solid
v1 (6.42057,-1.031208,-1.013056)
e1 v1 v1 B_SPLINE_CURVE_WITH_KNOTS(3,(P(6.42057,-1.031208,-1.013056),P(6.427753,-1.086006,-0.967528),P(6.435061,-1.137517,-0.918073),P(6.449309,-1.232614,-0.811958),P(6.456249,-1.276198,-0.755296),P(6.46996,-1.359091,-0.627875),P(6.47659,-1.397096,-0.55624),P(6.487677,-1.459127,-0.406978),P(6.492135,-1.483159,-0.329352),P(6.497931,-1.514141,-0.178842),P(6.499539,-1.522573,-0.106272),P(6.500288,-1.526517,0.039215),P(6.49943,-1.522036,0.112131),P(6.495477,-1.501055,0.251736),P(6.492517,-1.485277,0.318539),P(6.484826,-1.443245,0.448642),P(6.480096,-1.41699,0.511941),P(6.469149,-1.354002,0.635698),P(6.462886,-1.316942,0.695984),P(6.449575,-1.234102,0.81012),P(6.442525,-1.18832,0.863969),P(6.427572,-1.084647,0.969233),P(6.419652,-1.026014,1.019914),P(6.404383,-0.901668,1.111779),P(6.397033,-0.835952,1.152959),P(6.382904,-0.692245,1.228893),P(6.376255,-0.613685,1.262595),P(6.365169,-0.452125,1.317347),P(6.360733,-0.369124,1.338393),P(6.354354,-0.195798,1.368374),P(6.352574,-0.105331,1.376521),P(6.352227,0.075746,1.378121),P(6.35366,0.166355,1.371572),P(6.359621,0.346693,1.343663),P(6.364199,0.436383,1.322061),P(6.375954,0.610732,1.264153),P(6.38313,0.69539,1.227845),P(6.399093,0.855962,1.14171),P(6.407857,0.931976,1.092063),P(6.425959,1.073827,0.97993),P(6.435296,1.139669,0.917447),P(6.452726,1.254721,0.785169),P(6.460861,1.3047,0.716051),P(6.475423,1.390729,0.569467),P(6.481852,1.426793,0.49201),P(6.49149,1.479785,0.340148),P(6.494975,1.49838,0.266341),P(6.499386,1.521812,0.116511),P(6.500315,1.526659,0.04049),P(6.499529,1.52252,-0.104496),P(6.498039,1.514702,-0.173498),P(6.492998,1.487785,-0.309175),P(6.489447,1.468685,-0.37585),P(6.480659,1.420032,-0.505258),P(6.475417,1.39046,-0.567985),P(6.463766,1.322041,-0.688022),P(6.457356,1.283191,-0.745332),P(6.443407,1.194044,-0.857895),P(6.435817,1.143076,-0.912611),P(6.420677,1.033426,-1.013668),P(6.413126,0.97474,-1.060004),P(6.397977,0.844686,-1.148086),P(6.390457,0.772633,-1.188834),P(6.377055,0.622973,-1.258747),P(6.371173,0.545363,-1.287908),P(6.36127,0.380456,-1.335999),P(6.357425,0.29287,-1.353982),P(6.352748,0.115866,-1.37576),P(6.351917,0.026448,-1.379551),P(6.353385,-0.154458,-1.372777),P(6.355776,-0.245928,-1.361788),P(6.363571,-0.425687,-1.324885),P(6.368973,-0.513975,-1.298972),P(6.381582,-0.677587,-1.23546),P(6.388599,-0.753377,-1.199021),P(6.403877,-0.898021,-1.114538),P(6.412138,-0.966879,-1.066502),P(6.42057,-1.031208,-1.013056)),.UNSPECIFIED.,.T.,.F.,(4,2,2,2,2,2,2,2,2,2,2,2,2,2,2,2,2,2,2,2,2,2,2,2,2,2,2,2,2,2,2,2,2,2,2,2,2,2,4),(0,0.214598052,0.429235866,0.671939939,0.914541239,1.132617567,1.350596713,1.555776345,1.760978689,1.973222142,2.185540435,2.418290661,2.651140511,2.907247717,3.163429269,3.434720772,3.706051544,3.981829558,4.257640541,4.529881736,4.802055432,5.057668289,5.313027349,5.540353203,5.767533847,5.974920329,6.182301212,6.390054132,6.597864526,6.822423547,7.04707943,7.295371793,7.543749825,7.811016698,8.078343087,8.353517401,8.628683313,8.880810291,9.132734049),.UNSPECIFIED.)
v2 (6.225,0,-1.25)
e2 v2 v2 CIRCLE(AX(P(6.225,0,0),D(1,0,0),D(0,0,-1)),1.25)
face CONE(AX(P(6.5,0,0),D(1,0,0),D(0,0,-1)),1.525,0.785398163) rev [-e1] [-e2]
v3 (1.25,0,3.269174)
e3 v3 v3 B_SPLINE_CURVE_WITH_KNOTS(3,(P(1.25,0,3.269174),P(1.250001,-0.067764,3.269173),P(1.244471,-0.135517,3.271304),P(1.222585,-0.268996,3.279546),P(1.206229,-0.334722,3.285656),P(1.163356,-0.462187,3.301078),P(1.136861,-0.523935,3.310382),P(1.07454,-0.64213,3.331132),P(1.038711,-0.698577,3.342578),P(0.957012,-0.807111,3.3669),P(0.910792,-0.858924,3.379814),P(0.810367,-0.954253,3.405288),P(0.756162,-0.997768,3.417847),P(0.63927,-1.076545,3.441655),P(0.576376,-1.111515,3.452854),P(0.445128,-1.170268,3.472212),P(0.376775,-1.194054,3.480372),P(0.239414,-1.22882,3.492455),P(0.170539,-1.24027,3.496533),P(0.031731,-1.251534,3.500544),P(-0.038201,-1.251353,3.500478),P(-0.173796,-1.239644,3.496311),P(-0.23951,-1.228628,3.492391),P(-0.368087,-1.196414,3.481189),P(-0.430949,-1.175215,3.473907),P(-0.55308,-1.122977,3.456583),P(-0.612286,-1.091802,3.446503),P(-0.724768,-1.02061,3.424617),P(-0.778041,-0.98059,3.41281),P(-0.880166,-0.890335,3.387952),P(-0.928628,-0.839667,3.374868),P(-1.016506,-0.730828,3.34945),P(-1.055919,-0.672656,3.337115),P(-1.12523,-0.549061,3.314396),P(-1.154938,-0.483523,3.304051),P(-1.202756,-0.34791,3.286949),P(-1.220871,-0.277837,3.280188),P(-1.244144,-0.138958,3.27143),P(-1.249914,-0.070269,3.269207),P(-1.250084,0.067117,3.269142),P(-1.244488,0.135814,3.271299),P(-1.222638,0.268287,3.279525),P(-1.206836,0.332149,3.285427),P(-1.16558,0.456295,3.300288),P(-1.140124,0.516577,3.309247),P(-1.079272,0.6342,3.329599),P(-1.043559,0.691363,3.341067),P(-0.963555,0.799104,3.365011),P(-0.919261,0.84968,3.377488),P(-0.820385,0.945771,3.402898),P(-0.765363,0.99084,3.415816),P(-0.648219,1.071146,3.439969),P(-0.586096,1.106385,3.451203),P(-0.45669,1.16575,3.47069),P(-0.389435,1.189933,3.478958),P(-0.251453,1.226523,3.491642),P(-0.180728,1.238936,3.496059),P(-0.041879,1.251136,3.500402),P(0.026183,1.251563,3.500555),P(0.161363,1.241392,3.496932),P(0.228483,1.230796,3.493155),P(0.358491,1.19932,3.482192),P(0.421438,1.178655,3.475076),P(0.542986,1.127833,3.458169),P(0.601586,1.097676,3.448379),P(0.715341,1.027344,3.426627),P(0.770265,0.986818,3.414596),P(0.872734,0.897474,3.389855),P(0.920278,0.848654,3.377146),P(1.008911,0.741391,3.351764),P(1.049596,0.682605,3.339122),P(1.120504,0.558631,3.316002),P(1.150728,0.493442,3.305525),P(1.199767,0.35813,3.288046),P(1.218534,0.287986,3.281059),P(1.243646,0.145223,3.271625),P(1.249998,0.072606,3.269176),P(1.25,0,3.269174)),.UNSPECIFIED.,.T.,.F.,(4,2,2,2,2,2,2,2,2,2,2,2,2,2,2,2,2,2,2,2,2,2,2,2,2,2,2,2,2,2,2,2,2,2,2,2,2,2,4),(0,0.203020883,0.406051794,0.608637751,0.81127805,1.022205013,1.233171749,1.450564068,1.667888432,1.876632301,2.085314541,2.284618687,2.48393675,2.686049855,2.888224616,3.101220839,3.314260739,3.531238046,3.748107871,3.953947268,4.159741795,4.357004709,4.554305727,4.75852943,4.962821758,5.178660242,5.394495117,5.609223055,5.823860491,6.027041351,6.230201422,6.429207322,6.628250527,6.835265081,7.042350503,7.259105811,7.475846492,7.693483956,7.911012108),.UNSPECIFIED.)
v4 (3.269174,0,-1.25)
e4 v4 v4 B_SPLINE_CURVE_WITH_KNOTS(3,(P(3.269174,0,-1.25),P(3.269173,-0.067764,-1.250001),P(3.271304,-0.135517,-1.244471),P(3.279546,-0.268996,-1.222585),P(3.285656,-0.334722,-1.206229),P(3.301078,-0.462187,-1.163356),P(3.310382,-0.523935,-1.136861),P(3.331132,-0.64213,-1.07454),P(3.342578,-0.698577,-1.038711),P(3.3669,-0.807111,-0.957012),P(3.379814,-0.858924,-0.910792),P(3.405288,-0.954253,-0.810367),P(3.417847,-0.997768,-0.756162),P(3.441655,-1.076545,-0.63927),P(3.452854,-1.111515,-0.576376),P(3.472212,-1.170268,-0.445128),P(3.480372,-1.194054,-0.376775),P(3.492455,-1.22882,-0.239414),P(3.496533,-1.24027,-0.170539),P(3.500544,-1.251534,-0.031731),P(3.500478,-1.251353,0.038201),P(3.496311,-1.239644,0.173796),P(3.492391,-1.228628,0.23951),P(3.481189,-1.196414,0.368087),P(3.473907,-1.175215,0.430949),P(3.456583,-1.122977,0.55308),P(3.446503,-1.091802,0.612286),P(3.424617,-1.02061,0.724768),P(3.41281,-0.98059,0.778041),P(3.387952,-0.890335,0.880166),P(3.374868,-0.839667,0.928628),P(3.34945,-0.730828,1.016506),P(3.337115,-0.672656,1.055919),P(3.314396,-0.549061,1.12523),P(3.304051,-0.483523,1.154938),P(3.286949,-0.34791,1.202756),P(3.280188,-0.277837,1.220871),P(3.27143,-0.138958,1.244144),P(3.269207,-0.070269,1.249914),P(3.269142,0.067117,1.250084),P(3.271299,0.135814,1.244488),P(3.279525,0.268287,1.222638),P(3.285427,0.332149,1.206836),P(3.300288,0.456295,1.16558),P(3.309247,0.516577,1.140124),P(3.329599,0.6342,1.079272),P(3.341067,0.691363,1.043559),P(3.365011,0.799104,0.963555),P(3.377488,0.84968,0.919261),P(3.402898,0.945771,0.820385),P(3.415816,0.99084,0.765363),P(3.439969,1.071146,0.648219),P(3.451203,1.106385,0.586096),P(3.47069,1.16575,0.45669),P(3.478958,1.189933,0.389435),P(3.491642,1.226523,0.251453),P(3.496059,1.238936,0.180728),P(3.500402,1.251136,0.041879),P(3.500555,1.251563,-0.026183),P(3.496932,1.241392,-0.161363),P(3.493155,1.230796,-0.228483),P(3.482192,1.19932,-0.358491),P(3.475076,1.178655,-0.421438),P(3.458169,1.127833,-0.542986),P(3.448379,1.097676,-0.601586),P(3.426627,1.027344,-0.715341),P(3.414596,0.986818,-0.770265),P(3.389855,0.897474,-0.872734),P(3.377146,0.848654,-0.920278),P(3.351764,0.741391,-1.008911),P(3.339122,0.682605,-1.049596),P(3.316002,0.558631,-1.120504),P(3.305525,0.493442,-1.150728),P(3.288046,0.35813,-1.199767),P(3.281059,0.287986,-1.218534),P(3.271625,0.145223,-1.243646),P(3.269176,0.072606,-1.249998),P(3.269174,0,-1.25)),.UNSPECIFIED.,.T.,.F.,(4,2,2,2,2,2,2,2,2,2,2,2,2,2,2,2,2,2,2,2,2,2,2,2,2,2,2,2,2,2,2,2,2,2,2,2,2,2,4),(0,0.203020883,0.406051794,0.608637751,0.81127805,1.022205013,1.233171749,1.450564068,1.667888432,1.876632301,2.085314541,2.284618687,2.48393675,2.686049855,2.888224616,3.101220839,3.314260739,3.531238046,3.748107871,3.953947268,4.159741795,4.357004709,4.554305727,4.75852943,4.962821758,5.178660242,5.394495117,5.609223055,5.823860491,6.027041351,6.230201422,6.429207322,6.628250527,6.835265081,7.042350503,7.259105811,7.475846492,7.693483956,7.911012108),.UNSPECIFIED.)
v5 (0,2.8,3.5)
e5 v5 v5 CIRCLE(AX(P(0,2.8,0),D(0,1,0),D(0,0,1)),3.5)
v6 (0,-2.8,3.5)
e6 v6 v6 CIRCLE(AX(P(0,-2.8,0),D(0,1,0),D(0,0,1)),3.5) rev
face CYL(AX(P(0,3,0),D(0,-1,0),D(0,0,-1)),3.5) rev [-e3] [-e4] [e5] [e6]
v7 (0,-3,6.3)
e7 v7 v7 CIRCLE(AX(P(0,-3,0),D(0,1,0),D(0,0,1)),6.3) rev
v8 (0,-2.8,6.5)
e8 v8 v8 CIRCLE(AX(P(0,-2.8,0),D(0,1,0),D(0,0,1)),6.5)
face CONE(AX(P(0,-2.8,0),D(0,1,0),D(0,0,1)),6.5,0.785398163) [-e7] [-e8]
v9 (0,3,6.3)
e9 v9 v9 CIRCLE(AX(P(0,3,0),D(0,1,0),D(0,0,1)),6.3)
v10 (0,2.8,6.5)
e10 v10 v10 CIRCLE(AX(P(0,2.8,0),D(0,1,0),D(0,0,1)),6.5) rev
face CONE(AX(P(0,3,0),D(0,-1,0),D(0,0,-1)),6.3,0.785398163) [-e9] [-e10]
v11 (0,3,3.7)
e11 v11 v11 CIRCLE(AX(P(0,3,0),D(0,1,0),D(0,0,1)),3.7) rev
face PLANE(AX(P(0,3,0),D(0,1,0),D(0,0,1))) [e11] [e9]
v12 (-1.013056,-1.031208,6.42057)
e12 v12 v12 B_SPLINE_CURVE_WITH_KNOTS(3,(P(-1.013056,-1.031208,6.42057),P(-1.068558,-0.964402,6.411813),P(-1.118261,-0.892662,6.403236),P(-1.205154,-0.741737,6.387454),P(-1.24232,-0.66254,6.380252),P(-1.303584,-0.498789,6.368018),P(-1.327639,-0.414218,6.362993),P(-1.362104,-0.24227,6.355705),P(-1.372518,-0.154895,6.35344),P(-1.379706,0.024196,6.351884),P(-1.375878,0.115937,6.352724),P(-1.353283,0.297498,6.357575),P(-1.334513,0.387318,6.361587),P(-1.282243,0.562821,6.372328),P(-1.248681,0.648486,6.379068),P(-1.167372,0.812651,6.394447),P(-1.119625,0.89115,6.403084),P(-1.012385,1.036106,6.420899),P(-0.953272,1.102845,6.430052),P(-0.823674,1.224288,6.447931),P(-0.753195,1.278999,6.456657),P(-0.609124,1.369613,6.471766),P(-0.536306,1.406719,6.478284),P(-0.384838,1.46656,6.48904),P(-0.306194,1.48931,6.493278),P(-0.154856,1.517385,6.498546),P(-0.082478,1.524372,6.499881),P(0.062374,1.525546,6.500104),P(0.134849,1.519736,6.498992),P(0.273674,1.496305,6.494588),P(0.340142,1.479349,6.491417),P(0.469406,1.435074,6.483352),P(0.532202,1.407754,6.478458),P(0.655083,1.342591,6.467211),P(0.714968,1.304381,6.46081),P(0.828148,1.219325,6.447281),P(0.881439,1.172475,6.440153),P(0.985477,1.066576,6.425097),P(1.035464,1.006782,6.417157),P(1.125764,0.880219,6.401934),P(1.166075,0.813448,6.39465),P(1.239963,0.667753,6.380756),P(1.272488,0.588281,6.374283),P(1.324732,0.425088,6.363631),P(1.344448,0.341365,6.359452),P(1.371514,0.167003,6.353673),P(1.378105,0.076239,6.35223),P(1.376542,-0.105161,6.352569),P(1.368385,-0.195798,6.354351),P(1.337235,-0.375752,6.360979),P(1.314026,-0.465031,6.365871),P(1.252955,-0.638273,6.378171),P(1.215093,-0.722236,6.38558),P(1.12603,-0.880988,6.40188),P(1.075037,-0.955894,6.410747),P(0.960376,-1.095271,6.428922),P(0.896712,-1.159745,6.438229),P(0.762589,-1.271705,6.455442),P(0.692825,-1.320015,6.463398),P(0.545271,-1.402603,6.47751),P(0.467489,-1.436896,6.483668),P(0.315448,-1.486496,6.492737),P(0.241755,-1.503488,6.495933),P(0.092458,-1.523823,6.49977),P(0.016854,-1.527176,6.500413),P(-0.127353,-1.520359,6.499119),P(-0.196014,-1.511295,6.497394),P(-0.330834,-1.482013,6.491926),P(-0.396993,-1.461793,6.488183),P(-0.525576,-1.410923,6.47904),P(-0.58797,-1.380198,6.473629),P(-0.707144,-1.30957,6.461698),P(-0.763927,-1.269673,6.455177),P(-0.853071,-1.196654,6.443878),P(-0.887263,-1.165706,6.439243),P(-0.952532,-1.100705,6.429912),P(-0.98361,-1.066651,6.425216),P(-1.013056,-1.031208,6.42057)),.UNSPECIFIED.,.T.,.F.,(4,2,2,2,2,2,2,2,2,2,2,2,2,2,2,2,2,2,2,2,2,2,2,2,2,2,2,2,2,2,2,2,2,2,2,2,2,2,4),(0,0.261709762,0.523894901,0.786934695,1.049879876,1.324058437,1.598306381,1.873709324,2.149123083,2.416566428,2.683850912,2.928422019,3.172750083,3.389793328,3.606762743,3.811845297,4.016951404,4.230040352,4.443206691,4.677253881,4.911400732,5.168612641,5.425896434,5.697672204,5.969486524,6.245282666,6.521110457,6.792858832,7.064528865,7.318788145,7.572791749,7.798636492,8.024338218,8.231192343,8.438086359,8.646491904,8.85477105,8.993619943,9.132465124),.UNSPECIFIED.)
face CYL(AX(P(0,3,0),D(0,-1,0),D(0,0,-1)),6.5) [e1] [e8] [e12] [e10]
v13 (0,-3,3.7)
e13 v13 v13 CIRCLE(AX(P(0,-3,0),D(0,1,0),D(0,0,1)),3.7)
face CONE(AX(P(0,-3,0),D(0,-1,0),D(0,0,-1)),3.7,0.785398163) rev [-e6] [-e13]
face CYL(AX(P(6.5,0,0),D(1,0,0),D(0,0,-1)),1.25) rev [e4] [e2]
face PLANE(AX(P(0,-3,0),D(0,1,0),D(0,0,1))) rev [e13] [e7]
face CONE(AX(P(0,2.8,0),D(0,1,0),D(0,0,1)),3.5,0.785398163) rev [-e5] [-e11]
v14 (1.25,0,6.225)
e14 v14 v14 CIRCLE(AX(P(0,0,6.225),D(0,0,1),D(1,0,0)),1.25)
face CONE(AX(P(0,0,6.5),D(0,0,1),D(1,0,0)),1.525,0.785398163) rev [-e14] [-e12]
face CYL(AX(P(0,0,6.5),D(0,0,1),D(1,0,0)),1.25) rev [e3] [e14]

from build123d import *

# Parameters (mm, degrees)
PROFILES_R        = 6.5
PROFILES_R_2      = 3.5
PROFILE_DEPTH     = 3
CIRPATTERN1_COUNT = 2
CIRPATTERN1_ANGLE = 90
OUTERC_SIZE       = 0.2
INNERC_SIZE       = 0.2


# Read off the part's stored shape, not the designer's step:  Tapped Hole1
with BuildPart() as part:
    # ProfileS → Profile (new, symmetric)
    with BuildSketch(Plane(origin=(0, 0, 0), x_dir=(1, 0, 0), z_dir=(0, 1, 0))):
        with Locations(Location((0, 0, 0), (0, 0, 270))):
            Circle(PROFILES_R)
        with Locations(Location((0, 0, 0), (0, 0, 270))):
            Circle(PROFILES_R_2, mode=Mode.SUBTRACT)
    extrude(amount=PROFILE_DEPTH, both=True)

    # Tapped Hole1 outline → Tapped Hole1 (revolve, cut)
    with BuildSketch(Plane.XZ):
        Polygon((1.525000359, 6.500000359), (0, 6.500000359), (0, 3.269069771), (1.25, 3.269069771), (1.25, 6.225), align=None)
    tapped_hole1 = revolve(axis=Axis((0, 0, 0), (0, 0, 1)), mode=Mode.SUBTRACT)

    # CirPattern1: Tapped Hole1 ×2 about axis
    cirpattern1_axis = Axis((0, 3, 0), (0, 1, 0))
    for i in range(1, CIRPATTERN1_COUNT):
        add(tapped_hole1.rotate(cirpattern1_axis, i * CIRPATTERN1_ANGLE / (CIRPATTERN1_COUNT - 1)), mode=Mode.SUBTRACT)

    # OuterC
    outerc_edges = [part.edges().sort_by_distance(p)[0] for p in [
        (0, -3, -6.5),
        (0, 3, -6.5),
    ]]
    chamfer(outerc_edges, length=OUTERC_SIZE)

    # InnerC
    innerc_edges = [part.edges().sort_by_distance(p)[0] for p in [
        (0, -3, -3.5),
        (0, 3, -3.5),
    ]]
    chamfer(innerc_edges, length=INNERC_SIZE)


solid = part.part
